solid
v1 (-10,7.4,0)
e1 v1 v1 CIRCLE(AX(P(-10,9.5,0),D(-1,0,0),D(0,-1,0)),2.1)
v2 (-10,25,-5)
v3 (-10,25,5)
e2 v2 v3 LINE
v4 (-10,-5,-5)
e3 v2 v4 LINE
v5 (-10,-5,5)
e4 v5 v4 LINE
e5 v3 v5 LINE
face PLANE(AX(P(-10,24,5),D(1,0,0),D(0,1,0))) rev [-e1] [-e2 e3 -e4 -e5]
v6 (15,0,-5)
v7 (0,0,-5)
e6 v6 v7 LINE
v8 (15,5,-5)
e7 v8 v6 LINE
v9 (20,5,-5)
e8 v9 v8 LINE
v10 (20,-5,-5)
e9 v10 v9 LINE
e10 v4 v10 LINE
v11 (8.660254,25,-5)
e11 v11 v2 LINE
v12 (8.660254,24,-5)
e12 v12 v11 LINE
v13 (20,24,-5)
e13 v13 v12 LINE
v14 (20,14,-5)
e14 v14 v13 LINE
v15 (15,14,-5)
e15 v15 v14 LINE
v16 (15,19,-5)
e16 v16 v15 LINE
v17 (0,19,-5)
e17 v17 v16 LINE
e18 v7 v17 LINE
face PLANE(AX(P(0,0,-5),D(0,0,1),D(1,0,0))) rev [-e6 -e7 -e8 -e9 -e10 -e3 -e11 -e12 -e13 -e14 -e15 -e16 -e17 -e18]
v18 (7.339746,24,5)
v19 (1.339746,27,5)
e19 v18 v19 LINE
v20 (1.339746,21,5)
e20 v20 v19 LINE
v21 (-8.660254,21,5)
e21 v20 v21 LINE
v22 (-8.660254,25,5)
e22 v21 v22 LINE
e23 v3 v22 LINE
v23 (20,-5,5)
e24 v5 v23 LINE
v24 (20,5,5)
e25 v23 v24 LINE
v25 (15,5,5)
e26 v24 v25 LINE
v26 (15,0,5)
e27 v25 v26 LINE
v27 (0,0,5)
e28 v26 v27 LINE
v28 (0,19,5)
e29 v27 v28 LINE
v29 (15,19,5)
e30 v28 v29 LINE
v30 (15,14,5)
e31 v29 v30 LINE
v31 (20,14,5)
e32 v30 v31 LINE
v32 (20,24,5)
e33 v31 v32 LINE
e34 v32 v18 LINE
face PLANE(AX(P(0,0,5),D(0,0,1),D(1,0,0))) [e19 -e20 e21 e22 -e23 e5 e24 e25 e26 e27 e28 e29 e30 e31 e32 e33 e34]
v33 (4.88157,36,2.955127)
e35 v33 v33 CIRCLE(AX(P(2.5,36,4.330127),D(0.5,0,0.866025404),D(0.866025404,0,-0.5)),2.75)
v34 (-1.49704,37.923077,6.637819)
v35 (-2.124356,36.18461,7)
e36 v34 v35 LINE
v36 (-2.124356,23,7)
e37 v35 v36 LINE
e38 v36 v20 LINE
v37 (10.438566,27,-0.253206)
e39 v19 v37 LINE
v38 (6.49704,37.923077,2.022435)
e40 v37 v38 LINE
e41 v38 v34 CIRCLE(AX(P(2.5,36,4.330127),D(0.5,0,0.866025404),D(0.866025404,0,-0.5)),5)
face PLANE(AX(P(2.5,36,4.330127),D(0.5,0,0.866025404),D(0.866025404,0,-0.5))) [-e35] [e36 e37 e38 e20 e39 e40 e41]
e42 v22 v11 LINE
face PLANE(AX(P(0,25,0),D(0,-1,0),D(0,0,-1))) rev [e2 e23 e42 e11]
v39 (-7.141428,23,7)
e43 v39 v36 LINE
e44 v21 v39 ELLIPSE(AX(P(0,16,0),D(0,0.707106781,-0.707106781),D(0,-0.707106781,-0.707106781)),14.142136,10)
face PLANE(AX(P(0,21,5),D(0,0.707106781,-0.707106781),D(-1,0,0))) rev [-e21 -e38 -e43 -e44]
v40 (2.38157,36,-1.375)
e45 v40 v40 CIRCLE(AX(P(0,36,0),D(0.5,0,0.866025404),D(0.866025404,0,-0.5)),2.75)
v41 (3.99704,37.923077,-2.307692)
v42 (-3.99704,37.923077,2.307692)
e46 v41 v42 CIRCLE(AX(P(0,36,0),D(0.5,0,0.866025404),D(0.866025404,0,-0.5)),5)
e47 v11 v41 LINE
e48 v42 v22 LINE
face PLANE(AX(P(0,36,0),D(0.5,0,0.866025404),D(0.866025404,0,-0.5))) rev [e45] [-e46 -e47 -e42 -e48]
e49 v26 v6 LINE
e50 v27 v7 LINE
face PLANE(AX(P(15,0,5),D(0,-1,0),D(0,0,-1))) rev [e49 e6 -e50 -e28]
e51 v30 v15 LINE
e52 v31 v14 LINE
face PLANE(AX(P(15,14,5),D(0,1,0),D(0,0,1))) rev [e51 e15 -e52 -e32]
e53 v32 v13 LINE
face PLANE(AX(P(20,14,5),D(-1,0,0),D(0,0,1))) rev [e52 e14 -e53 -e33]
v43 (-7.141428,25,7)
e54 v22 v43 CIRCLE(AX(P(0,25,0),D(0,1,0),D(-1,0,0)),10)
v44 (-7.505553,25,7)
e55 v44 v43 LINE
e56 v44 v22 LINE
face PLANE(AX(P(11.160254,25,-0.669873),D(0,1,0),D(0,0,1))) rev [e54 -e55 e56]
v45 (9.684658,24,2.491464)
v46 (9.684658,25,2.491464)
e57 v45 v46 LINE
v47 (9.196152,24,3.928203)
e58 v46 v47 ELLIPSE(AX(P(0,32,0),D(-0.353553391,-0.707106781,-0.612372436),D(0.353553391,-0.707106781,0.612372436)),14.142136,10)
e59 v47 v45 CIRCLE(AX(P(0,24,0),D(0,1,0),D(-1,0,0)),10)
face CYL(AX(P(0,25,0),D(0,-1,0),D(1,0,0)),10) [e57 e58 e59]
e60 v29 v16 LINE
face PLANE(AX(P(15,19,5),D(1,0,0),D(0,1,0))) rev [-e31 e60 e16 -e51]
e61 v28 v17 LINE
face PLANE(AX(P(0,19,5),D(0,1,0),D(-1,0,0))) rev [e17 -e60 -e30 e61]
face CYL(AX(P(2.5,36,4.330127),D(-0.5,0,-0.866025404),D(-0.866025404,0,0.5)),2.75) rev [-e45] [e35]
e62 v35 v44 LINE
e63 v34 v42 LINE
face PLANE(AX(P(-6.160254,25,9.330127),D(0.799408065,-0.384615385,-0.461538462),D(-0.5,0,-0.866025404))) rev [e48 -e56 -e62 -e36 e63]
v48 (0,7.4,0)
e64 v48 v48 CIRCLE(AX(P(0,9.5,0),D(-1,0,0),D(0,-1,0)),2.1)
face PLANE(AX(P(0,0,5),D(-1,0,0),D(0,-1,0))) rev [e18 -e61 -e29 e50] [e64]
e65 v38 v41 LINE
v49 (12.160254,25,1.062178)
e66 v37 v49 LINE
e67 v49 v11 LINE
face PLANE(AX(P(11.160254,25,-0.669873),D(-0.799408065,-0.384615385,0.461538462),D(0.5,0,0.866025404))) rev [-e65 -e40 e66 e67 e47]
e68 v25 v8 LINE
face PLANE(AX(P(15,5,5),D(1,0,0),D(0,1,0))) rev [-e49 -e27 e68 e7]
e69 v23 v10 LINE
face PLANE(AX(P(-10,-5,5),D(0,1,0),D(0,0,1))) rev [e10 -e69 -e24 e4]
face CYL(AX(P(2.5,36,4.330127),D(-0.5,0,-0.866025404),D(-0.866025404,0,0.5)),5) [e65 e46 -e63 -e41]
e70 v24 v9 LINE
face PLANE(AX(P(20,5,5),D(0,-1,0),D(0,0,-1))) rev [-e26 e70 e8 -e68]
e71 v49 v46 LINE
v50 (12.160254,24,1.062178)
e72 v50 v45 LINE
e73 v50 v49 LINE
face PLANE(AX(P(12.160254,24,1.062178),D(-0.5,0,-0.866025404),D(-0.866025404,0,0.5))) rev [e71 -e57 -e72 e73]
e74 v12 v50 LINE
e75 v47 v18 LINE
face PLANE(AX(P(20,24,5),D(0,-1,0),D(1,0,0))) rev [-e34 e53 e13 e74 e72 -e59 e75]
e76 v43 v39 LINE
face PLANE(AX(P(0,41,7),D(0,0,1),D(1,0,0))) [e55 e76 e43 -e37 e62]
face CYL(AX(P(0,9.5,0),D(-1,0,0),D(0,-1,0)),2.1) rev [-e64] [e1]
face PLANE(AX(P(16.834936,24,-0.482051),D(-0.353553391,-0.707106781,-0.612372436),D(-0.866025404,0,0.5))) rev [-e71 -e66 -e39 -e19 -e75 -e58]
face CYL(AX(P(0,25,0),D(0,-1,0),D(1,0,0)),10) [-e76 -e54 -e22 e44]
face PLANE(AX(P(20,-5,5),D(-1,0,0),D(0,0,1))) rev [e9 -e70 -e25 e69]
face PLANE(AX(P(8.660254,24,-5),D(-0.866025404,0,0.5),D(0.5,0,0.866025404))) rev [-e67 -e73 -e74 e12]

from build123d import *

# Parameters (mm, degrees)
BOSS_EXTRUDE1_DEPTH = 5
SKETCH2_R           = 2.1
CUT_EXTRUDE1_DEPTH  = 10
SKETCH3_R           = 10
BOSS_EXTRUDE2_DEPTH = 1
SKETCH4_R           = 2.75
BOSS_EXTRUDE3_DEPTH = 5
SKETCH5_W           = 50
SKETCH5_H           = 30
SKETCH5_W_2         = 34
SKETCH5_H_2         = 14
CUT_EXTRUDE2_DEPTH  = 52.14684741
CUT_EXTRUDE3_START  = -1
CUT_EXTRUDE3_DEPTH  = 1
CUT_EXTRUDE4_START  = -1
CUT_EXTRUDE4_DEPTH  = 1
CHAMFER1_SIZE       = 3
CHAMFER2_SIZE       = 3
BOSS_EXTRUDE4_DEPTH = 1
BOSS_EXTRUDE5_START = 1
BOSS_EXTRUDE5_DEPTH = 1


with BuildPart() as part:
    # Sketch1 → Boss-Extrude1 (new, symmetric)
    with BuildSketch(Plane.XY):
        Polygon((15, 5), (15, 0), (0, 0), (0, 19), (15, 19), (15, 14), (20, 14), (20, 24), (-10, 24), (-10, -5), (20, -5), (20, 5), align=None)
    extrude(amount=BOSS_EXTRUDE1_DEPTH, both=True)

    # Sketch2 → Cut-Extrude1 (cut)
    with BuildSketch(Plane.ZY.offset(10)):
        with Locations(Location((0, 9.5, 0), (0, 0, 270))):
            Circle(SKETCH2_R)
    extrude(amount=-CUT_EXTRUDE1_DEPTH, mode=Mode.SUBTRACT)

    # Sketch3 → Boss-Extrude2 (add)
    with BuildSketch(Plane(origin=(0, 24, 0), x_dir=(1, 0, 0), z_dir=(0, 1, 0))):
        with Locations(Location((0, 0, 0), (0, 0, 180))):
            Circle(SKETCH3_R)
    extrude(amount=BOSS_EXTRUDE2_DEPTH)

    # Sketch4 → Boss-Extrude3 (add)
    with BuildSketch(Plane(origin=(0, 0, 0), x_dir=(0.866025403784438, 0, -0.500000000000001), z_dir=(0.500000000000001, 0, 0.866025403784438))):
        with BuildLine():
            Line((10, 25), (-10, 25))
            Line((-10, 25), (-4.615384615, 37.923076923))
            ThreePointArc((-4.615384615, 37.923076923), (0, 41), (4.615384615, 37.923076923))
            Line((4.615384615, 37.923076923), (10, 25))
        make_face()
        with Locations((0, 36)):
            Circle(SKETCH4_R, mode=Mode.SUBTRACT)
    extrude(amount=BOSS_EXTRUDE3_DEPTH)

    # Sketch5 → Cut-Extrude2 (cut, through all)
    with BuildSketch(Plane.XZ.offset(5)):
        with Locations((5, 0)):
            Rectangle(SKETCH5_W, SKETCH5_H)
        with Locations((5, 0)):
            Rectangle(SKETCH5_W_2, SKETCH5_H_2, mode=Mode.SUBTRACT)
    extrude(amount=-CUT_EXTRUDE2_DEPTH, mode=Mode.SUBTRACT)

    # Sketch6 → Cut-Extrude3 (cut)
    with BuildSketch(Plane(origin=(0, 25, 0), x_dir=(1, 0, 0), z_dir=(0, 1, 0)).offset(CUT_EXTRUDE3_START)):
        with BuildLine():
            Line((7.141428429, 7), (-7.141428429, 7))
            ThreePointArc((-7.141428429, 7), (-9.920851384, 1.255670262), (-8.660254038, -5))
            Line((-8.660254038, -5), (8.660254038, 5))
            ThreePointArc((8.660254038, 5), (7.963874195, 6.047868038), (7.141428429, 7))
        make_face()
    extrude(amount=CUT_EXTRUDE3_DEPTH, mode=Mode.SUBTRACT)

    # Sketch7 → Cut-Extrude4 (cut)
    with BuildSketch(Plane(origin=(0, 25, 0), x_dir=(1, 0, 0), z_dir=(0, 1, 0)).offset(CUT_EXTRUDE4_START)):
        with BuildLine():
            Line((-2.124355653, -7), (7.141428429, -7))
            ThreePointArc((7.141428429, -7), (9.257815193, -3.780589618), (10, 0))
            Line((10, 0), (-2.124355653, -7))
        make_face()
    extrude(amount=CUT_EXTRUDE4_DEPTH, mode=Mode.SUBTRACT)

    # Chamfer1
    chamfer1_edges = [part.edges().sort_by_distance(p)[0] for p in [
        (5.669872981, 24, 2.5),
    ]]
    chamfer(chamfer1_edges, length=CHAMFER1_SIZE)

    # Chamfer2
    # the kernel refuses this chamfer: 3 mm, written as the material it adds along each edge
    with BuildSketch(Plane(origin=(9.054794926, 24, 5), x_dir=(0, -0.9996219169112968, -0.02749587661058648), z_dir=(-1, 0, 0))) as chamfer2_piece_1_section:
        Polygon((CHAMFER2_SIZE * 0.999621916911, CHAMFER2_SIZE * 0.0274958766106), (-CHAMFER2_SIZE * 0.0274958766106, CHAMFER2_SIZE * 0.999621916911), (0, 0), align=None)
    chamfer2_piece_1 = extrude(amount=25.430097928, mode=Mode.PRIVATE)
    chamfer2_piece_1 = split(chamfer2_piece_1, bisect_by=Plane(origin=(-3.023607394, 22.869371877, 7.519183235), z_dir=(-0.5000000000000006, 0, -0.8660254037844384)), keep=Keep.TOP, mode=Mode.PRIVATE)
    chamfer2_piece_1 = chamfer2_piece_1 & Plane(origin=(0, 22.869371877, 0), x_dir=(-1, 0, 0), z_dir=(0, -1, 0)) * Cylinder(10, 63, mode=Mode.PRIVATE)
    chamfer2_piece_1 = split(chamfer2_piece_1, bisect_by=Plane(origin=(-4.051544608, 22.869371877, 7), z_dir=(0, 0, -1)), keep=Keep.TOP, mode=Mode.PRIVATE)
    add(chamfer2_piece_1)

    # Sketch9 → Boss-Extrude4 (add)
    with BuildSketch(Plane(origin=(0, 24, 0), x_dir=(1, 0, 0), z_dir=(0, 1, 0))):
        Polygon((8.660254038, 5), (-10, 5), (-10, -5), (-8.660254038, -5), align=None)
    extrude(amount=BOSS_EXTRUDE4_DEPTH)

    # Sketch10 → Boss-Extrude5 (add)
    with BuildSketch(Plane.XZ.offset(-25).offset(BOSS_EXTRUDE5_START)):
        with BuildLine():
            Line((8.660254038, -5), (12.160254038, 1.062177826))
            Line((12.160254038, 1.062177826), (9.684658438, 2.491463612))
            ThreePointArc((9.684658438, 2.491463612), (9.907797949, -1.354820946), (8.660254038, -5))
        make_face()
    extrude(amount=-BOSS_EXTRUDE5_DEPTH)


solid = part.part
